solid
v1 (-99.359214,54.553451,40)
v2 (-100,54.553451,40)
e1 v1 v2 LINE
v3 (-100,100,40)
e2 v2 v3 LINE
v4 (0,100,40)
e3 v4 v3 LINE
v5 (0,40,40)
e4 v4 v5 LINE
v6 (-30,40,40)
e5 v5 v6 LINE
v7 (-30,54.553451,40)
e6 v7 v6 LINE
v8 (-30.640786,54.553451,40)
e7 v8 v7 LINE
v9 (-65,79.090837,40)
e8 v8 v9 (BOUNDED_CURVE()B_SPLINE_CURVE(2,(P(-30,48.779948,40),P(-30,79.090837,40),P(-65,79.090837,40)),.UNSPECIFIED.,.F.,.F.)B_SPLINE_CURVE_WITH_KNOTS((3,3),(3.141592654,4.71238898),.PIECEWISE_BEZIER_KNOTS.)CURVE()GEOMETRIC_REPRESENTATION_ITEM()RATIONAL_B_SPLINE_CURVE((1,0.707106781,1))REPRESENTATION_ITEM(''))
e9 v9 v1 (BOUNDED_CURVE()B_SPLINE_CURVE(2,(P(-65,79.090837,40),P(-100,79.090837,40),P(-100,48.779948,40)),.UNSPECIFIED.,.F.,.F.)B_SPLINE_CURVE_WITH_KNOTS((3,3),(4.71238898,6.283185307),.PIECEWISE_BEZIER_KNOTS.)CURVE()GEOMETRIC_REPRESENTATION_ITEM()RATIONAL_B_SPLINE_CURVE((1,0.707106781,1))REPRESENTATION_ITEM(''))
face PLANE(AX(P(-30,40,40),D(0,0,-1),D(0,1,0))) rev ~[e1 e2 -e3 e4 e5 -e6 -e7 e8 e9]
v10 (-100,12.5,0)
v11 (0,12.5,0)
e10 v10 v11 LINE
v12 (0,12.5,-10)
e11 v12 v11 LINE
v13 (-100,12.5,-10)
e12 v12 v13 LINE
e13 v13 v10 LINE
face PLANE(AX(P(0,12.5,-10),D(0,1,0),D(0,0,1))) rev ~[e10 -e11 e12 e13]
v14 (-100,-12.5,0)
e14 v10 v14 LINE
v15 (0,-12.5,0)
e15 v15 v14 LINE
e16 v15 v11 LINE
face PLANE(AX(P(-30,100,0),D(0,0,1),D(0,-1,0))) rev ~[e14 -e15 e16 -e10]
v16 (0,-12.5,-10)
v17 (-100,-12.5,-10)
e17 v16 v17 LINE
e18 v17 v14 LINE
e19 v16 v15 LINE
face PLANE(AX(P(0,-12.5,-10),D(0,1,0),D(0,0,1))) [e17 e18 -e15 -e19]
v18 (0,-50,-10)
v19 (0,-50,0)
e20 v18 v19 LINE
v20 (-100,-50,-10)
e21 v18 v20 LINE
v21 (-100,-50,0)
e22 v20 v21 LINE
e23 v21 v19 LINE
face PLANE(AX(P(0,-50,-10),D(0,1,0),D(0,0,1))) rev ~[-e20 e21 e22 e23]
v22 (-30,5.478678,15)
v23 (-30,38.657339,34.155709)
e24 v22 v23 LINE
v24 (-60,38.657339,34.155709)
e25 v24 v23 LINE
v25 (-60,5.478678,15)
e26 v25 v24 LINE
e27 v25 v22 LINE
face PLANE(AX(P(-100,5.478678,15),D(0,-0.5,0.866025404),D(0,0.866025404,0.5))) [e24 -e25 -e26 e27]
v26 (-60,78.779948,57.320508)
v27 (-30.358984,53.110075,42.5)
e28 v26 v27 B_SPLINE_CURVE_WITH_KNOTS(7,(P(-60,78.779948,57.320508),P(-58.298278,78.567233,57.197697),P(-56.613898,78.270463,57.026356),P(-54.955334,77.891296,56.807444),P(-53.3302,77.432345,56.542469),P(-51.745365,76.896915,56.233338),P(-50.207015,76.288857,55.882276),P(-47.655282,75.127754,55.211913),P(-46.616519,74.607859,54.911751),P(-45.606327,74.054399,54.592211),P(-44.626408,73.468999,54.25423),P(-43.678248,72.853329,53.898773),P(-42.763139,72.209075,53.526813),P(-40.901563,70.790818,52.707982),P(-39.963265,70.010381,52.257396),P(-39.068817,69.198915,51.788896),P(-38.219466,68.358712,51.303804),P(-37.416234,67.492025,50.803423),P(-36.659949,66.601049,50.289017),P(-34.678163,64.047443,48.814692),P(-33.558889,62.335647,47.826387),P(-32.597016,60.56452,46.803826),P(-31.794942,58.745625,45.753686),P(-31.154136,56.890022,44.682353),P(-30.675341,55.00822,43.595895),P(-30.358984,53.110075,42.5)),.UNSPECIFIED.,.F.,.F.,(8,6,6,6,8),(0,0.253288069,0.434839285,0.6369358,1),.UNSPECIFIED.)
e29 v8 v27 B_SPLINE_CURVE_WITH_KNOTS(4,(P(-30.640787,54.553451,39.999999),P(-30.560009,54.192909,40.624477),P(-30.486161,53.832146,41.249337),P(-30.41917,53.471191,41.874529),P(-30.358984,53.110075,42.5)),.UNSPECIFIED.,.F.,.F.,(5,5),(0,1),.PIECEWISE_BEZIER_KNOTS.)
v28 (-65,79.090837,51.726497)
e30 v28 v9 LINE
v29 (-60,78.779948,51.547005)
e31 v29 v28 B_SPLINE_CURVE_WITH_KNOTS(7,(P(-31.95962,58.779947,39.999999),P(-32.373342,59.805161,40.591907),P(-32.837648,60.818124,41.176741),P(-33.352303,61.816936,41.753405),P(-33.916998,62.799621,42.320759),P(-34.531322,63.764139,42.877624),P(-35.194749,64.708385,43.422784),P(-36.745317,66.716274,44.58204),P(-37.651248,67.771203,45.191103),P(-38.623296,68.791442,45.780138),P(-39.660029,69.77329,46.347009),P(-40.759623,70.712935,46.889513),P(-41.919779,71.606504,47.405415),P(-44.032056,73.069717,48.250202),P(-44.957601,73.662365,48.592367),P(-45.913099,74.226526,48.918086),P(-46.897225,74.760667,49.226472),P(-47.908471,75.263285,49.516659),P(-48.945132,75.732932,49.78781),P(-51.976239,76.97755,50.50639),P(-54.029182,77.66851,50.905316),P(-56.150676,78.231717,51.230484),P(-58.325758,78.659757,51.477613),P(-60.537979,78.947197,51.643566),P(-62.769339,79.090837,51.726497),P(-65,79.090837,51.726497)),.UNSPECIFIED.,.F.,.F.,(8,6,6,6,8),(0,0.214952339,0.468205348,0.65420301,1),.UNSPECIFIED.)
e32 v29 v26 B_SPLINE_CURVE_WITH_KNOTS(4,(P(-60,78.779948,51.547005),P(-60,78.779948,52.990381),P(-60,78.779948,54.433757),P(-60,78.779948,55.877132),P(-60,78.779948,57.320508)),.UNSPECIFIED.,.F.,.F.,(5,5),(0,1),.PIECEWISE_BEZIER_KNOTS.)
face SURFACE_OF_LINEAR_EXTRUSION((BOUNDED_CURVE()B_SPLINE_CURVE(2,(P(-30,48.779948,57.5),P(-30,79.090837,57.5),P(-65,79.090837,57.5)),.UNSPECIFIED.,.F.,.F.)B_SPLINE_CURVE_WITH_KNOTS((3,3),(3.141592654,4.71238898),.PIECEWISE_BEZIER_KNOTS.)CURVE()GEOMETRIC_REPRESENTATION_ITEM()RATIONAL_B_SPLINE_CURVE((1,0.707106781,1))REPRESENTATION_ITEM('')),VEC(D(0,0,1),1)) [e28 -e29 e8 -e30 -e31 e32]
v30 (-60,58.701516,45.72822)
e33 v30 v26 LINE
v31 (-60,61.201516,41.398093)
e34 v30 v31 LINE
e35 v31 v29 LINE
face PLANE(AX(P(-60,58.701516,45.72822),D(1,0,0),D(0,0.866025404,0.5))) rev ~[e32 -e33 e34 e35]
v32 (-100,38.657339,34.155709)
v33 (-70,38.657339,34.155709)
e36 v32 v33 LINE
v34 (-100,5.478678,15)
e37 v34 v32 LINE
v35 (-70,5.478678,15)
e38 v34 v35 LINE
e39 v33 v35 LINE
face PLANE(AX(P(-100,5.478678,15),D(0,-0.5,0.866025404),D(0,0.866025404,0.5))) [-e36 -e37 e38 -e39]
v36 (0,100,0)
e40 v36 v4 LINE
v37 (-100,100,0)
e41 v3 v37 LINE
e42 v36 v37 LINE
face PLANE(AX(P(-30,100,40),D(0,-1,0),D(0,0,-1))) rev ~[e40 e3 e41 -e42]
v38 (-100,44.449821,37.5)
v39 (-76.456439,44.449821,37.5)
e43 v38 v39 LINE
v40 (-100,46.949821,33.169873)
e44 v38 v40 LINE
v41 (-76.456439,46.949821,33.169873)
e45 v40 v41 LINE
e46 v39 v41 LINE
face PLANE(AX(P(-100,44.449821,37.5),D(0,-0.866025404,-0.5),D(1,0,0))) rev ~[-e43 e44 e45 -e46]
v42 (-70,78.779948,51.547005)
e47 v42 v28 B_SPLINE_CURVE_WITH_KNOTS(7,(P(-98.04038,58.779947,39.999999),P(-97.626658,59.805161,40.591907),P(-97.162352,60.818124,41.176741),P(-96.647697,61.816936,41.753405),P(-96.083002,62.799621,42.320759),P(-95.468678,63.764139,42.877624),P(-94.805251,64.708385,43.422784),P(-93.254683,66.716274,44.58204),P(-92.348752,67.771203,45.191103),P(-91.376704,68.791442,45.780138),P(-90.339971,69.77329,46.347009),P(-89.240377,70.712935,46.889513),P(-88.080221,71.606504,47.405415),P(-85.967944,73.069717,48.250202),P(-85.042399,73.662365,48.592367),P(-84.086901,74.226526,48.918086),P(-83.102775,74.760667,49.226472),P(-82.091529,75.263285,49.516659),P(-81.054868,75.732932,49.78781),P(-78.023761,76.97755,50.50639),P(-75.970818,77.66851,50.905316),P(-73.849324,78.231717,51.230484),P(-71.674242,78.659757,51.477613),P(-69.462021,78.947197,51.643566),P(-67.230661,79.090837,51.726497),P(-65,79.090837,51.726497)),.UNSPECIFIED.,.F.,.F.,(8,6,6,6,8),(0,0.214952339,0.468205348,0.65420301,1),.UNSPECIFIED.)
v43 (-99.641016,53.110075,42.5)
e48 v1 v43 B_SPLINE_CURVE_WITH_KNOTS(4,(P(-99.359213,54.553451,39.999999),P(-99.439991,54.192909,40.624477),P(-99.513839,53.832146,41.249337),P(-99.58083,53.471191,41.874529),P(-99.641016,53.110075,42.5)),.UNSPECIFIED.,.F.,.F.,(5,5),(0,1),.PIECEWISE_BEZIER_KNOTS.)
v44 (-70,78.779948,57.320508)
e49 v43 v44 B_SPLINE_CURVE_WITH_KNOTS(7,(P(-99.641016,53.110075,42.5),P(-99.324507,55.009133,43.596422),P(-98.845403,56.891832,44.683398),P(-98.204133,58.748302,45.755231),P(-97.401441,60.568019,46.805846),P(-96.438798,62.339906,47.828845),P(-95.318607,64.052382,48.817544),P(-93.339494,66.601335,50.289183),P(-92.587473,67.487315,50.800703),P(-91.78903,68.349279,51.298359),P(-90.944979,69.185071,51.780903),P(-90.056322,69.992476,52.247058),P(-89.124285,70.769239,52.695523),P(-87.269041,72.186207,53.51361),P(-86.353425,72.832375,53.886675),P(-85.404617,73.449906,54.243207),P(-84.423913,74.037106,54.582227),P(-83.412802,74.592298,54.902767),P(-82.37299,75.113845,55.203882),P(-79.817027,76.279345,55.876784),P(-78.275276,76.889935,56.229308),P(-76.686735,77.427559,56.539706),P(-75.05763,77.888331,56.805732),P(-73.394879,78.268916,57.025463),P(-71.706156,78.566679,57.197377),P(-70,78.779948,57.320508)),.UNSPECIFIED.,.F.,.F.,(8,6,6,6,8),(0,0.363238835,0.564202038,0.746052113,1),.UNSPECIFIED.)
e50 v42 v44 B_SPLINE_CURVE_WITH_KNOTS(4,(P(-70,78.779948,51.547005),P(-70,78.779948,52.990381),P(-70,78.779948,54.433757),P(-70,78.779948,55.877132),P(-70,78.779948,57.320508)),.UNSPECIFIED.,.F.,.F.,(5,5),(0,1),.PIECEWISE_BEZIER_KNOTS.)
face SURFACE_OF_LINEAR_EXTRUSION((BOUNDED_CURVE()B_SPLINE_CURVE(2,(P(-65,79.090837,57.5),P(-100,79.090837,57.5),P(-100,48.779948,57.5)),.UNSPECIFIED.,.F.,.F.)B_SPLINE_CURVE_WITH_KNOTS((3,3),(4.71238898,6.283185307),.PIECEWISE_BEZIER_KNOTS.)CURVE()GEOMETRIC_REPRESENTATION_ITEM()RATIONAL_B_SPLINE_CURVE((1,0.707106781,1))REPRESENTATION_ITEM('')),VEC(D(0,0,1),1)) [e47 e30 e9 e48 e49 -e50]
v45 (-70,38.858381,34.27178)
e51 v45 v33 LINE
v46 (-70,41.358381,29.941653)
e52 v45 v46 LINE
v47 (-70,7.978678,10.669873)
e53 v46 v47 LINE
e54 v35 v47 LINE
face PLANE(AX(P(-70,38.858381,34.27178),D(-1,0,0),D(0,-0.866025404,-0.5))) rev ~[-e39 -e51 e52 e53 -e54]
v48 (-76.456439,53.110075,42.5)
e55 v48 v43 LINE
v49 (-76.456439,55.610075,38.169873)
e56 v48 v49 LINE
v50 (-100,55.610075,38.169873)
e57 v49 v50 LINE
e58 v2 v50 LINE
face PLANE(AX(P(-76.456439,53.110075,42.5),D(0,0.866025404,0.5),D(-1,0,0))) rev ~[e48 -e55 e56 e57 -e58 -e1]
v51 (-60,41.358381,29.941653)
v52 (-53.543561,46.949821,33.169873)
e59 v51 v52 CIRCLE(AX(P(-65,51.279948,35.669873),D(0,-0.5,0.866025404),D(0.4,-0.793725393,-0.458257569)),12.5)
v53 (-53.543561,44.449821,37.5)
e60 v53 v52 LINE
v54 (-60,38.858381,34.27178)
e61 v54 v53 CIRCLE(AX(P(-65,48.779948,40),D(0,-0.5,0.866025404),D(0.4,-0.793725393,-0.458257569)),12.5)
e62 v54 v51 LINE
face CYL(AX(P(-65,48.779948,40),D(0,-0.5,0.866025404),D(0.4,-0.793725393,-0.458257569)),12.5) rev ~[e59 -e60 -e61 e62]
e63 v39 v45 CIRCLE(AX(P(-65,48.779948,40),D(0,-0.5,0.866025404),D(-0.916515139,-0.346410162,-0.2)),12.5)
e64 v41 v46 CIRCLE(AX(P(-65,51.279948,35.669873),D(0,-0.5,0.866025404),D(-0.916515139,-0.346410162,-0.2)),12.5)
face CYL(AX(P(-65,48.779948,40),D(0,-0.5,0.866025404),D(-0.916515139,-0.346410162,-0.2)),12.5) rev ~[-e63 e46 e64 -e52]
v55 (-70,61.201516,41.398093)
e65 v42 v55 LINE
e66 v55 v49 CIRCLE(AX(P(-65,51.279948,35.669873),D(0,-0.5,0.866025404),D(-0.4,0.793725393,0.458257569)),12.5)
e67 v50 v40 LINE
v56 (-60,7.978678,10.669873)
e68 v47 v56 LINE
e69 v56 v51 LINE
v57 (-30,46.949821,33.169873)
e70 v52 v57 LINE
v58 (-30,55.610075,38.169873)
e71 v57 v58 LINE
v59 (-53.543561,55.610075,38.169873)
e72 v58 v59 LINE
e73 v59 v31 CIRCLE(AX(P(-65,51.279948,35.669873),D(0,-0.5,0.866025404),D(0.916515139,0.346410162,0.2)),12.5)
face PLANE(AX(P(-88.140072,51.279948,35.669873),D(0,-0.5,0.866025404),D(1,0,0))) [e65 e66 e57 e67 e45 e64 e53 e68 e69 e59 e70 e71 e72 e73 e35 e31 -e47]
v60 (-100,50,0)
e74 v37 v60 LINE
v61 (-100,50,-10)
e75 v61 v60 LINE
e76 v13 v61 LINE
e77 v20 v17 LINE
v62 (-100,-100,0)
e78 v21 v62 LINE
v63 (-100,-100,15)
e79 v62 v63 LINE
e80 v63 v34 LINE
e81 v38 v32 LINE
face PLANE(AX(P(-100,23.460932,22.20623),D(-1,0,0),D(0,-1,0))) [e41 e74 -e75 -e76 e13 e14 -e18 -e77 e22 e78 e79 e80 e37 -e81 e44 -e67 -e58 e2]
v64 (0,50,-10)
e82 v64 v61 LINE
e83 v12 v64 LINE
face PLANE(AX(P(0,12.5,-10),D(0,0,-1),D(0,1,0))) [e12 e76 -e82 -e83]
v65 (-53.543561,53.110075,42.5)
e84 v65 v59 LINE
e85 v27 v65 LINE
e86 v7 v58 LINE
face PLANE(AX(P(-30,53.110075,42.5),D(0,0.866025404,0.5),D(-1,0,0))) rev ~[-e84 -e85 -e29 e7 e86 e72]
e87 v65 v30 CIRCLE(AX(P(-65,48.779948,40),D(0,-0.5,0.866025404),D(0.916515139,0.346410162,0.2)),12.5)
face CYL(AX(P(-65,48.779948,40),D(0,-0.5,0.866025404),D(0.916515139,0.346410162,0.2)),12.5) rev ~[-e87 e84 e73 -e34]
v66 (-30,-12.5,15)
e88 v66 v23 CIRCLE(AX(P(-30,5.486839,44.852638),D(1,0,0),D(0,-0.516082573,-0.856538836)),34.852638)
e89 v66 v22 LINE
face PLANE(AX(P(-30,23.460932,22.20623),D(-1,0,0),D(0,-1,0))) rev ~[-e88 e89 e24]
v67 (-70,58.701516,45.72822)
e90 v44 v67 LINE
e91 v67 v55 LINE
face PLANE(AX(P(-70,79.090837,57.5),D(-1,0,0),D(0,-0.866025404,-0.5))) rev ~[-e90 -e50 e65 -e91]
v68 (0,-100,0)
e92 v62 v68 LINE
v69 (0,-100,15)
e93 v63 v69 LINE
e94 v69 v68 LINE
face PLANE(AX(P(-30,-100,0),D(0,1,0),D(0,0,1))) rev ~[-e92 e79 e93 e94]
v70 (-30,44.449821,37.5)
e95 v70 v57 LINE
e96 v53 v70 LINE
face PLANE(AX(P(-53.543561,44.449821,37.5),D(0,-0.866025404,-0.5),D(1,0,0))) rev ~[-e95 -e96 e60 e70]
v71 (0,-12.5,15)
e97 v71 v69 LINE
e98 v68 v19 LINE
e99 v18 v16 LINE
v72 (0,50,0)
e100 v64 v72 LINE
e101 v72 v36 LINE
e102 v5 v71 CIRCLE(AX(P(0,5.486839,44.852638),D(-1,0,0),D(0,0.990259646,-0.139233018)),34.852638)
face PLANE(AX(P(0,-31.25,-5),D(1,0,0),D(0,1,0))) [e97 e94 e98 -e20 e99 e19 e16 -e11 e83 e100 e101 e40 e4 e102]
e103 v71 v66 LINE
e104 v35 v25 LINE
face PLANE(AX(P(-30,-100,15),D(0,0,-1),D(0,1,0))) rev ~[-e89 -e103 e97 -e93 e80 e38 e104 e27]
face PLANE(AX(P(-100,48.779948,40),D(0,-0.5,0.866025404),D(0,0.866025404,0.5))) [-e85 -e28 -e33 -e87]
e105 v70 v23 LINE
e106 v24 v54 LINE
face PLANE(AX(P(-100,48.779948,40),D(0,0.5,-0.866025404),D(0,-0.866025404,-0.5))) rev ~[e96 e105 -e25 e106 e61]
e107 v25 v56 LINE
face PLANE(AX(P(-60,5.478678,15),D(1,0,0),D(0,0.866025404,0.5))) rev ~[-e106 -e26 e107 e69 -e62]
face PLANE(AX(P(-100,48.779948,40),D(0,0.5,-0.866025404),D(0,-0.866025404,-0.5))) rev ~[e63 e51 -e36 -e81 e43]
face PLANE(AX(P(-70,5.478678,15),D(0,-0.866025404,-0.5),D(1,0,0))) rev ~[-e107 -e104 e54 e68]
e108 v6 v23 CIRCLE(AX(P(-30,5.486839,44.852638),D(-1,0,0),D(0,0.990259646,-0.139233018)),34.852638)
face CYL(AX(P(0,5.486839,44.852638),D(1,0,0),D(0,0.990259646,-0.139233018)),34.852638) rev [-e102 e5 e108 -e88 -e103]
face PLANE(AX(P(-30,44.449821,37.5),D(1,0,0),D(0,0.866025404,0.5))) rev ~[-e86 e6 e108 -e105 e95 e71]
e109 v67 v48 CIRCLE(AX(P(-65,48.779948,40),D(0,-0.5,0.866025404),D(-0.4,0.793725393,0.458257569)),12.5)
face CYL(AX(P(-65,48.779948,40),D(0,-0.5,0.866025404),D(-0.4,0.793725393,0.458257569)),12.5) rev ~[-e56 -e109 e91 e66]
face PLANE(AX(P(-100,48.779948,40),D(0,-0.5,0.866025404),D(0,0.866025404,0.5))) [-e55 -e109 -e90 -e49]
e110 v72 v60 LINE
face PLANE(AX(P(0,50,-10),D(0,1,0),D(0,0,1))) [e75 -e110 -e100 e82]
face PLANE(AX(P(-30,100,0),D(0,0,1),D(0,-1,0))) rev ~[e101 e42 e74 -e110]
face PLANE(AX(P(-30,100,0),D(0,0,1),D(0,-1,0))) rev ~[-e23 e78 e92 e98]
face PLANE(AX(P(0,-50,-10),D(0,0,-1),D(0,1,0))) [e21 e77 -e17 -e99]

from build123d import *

# Parameters (mm, degrees)
F1_DEPTH  = 30
F0_W      = 37.5
F0_H      = 10
F2_DEPTH  = 100
F4_DEPTH  = 70
F5_W      = 20.9091625453
F5_H      = 25
F6_DEPTH  = 70
F7_DEPTH  = 70
F9_DEPTH  = 5
F12_DEPTH = 17.5


with BuildPart() as f1:
    # F0 (on Right) → F1 (new body)
    with BuildSketch(Plane.YZ):
        with BuildLine():
            Line((-100, 15), (-100, 0))
            Line((-100, 0), (-50, 0))
            Line((-50, 0), (-12.5, 0))
            Line((-12.5, 0), (12.5, 0))
            Line((12.5, 0), (50, 0))
            Line((50, 0), (100, 0))
            Line((100, 0), (100, 40))
            Line((100, 40), (40, 40))
            ThreePointArc((40, 40), (20.4711584909, 13.3855671691), (-12.5, 15))
            Line((-12.5, 15), (-100, 15))
        make_face()
    extrude(amount=-F1_DEPTH)

    # F0 (on Right) → F2 (join)
    with BuildSketch(Plane.YZ):
        with Locations((-31.25, -5)):
            Rectangle(F0_W, F0_H)
        with Locations((31.25, -5)):
            Rectangle(F0_W, F0_H)
    extrude(amount=-F2_DEPTH)

    # F3 (on face) → F4 (join)
    with BuildSketch(Plane(origin=(-30, 0, 0), x_dir=(0, -1, 0), z_dir=(-1, 0, 0))):
        with BuildLine():
            Line((12.5, 15), (-23.473678133, 15))
            ThreePointArc((-23.473678133, 15), (-34.5610974405, 25.633015883), (-40, 40))
            Line((-40, 40), (-100, 40))
            Line((-100, 40), (-100, 0))
            Line((-100, 0), (-50, 0))
            Line((-50, 0), (-12.5, 0))
            Line((-12.5, 0), (12.5, 0))
            Line((12.5, 0), (50, 0))
            Line((50, 0), (100, 0))
            Line((100, 0), (100, 15))
            Line((100, 15), (12.5, 15))
        make_face()
    extrude(amount=F4_DEPTH)

    # F5 (on face) → F6 (join)
    with BuildSketch(Plane(origin=(-100, 0, 0), x_dir=(0, -1, 0), z_dir=(-1, 0, 0))):
        with BuildLine():
            Line((-23.473678133, 15), (-5.478678133, 15))
            Line((-5.478678133, 15), (-38.6573392432, 34.1557089233))
            ThreePointArc((-38.6573392432, 34.1557089233), (-32.7999061901, 23.2030943833), (-23.473678133, 15))
        make_face()
        with Locations((-89.5454187273, 27.5)):
            Rectangle(F5_W, F5_H)
        Polygon((-79.0908374547, 40), (-48.7799483222, 40), (-79.0908374547, 57.5), align=None)
    extrude(amount=-F6_DEPTH)

    # F5 (on face) → F7 (cut)
    with BuildSketch(Plane(origin=(-100, 0, 0), x_dir=(0, -1, 0), z_dir=(-1, 0, 0))):
        with BuildLine():
            Line((-48.7799483222, 40), (-38.6573392432, 34.1557089233))
            ThreePointArc((-38.6573392432, 34.1557089233), (-39.4545948044, 37.048924554), (-40, 40))
            Line((-40, 40), (-48.7799483222, 40))
        make_face()
    extrude(amount=-F7_DEPTH, mode=Mode.SUBTRACT)

    # F8 (on face) → F9 (cut)
    with BuildSketch(Plane(origin=(0, -5.1255209951, 8.8776627788), x_dir=(1, 0, 0), z_dir=(0, -0.5, 0.8660254038))):
        with BuildLine():
            Line((-85.9351158142, 57.2446744423), (-76.4564392374, 57.2446744423))
            ThreePointArc((-76.4564392374, 57.2446744423), (-77.5, 62.2446744423), (-76.4564392374, 67.2446744423))
            Line((-76.4564392374, 67.2446744423), (-85.9351158142, 67.2446744423))
            Line((-85.9351158142, 67.2446744423), (-99.6410161514, 67.2446744423))
            ThreePointArc((-99.6410161514, 67.2446744423), (-99.9101386799, 64.7511096302), (-100, 62.2446744423))
            ThreePointArc((-100, 62.2446744423), (-99.9101386799, 59.7382392545), (-99.6410161514, 57.2446744423))
            Line((-99.6410161514, 57.2446744423), (-85.9351158142, 57.2446744423))
        make_face()
        with BuildLine():
            Line((-60, 73.7011136797), (-60, 96.8856905937))
            ThreePointArc((-60, 96.8856905937), (-62.4935647997, 97.1548131213), (-64.999999975, 97.2446744423))
            ThreePointArc((-64.999999975, 97.2446744423), (-67.5064351754, 97.1548131231), (-70, 96.8856905937))
            Line((-70, 96.8856905937), (-70, 73.7011136797))
            ThreePointArc((-70, 73.7011136797), (-65, 74.7446744423), (-60, 73.7011136797))
        make_face()
        with BuildLine():
            Line((-70, 12.2446744423), (-60, 12.2446744423))
            Line((-60, 12.2446744423), (-60, 50.7882352049))
            ThreePointArc((-60, 50.7882352049), (-65, 49.7446744423), (-70, 50.7882352049))
            Line((-70, 50.7882352049), (-70, 12.2446744423))
        make_face()
        with BuildLine():
            ThreePointArc((-30.3589838486, 57.2446744423), (-30.0898613201, 59.7382392545), (-30, 62.2446744423))
            ThreePointArc((-30, 62.2446744423), (-30.0898613201, 64.7511096302), (-30.3589838486, 67.2446744423))
            Line((-30.3589838486, 67.2446744423), (-53.5435607626, 67.2446744423))
            ThreePointArc((-53.5435607626, 67.2446744423), (-52.7636710884, 64.7985449884), (-52.5, 62.2446744423))
            ThreePointArc((-52.5, 62.2446744423), (-52.7636710884, 59.6908038962), (-53.5435607626, 57.2446744423))
            Line((-53.5435607626, 57.2446744423), (-30.3589838486, 57.2446744423))
        make_face()
        with BuildLine():
            ThreePointArc((-64.999999975, 97.2446744423), (-62.4935647997, 97.1548131213), (-60, 96.8856905937))
            Line((-60, 96.8856905937), (-60, 97.2446744423))
            Line((-60, 97.2446744423), (-64.999999975, 97.2446744423))
        make_face()
        with BuildLine():
            ThreePointArc((-70, 96.8856905937), (-67.5064351754, 97.1548131231), (-64.999999975, 97.2446744423))
            Line((-64.999999975, 97.2446744423), (-70, 97.2446744423))
            Line((-70, 97.2446744423), (-70, 96.8856905937))
        make_face()
        with BuildLine():
            Line((-100, 67.2446744423), (-100, 62.2446744423))
            ThreePointArc((-100, 62.2446744423), (-99.9101386799, 64.7511096302), (-99.6410161514, 67.2446744423))
            Line((-99.6410161514, 67.2446744423), (-100, 67.2446744423))
        make_face()
        with BuildLine():
            Line((-100, 62.2446744423), (-100, 57.2446744423))
            Line((-100, 57.2446744423), (-99.6410161514, 57.2446744423))
            ThreePointArc((-99.6410161514, 57.2446744423), (-99.9101386799, 59.7382392545), (-100, 62.2446744423))
        make_face()
        with BuildLine():
            ThreePointArc((-30.3589838486, 67.2446744423), (-30.0898613201, 64.7511096302), (-30, 62.2446744423))
            Line((-30, 62.2446744423), (-30, 67.2446744423))
            Line((-30, 67.2446744423), (-30.3589838486, 67.2446744423))
        make_face()
        with BuildLine():
            Line((-30.3589838486, 57.2446744423), (-30, 57.2446744423))
            Line((-30, 57.2446744423), (-30, 62.2446744423))
            ThreePointArc((-30, 62.2446744423), (-30.0898613201, 59.7382392545), (-30.3589838486, 57.2446744423))
        make_face()
        with BuildLine():
            ThreePointArc((-70, 50.7882352049), (-65, 49.7446744423), (-60, 50.7882352049))
            ThreePointArc((-60, 50.7882352049), (-56.1611652352, 53.4058396775), (-53.5435607626, 57.2446744423))
            ThreePointArc((-53.5435607626, 57.2446744423), (-52.7636710884, 59.6908038962), (-52.5, 62.2446744423))
            ThreePointArc((-52.5, 62.2446744423), (-52.7636710884, 64.7985449884), (-53.5435607626, 67.2446744423))
            ThreePointArc((-53.5435607626, 67.2446744423), (-56.1611652352, 71.0835092071), (-60, 73.7011136797))
            ThreePointArc((-60, 73.7011136797), (-65, 74.7446744423), (-70, 73.7011136797))
            ThreePointArc((-70, 73.7011136797), (-73.8388347648, 71.0835092071), (-76.4564392374, 67.2446744423))
            ThreePointArc((-76.4564392374, 67.2446744423), (-77.5, 62.2446744423), (-76.4564392374, 57.2446744423))
            ThreePointArc((-76.4564392374, 57.2446744423), (-73.8388347648, 53.4058396775), (-70, 50.7882352049))
        make_face()
    extrude(amount=-F9_DEPTH, mode=Mode.SUBTRACT)

    # F11 (on offset) → F12 (cut)
    with BuildSketch(Plane.XY.offset(57.5)):
        with BuildLine():
            add(Edge.make_bspline(
                [(-65, 79.0908374547), (-100, 79.0908374547), (-100, 48.7799483222)],
                knots=[4.7123889804, 4.7123889804, 4.7123889804, 6.2831853072, 6.2831853072, 6.2831853072], degree=2, weights=[1, 0.7071067812, 1]))
            Line((-65, 79.0908374547), (-100, 79.0908374547))
            Line((-100, 79.0908374547), (-100, 48.7799483222))
        make_face()
        with BuildLine():
            Line((-30, 48.7799483222), (-30, 79.0908374547))
            Line((-30, 79.0908374547), (-65, 79.0908374547))
            add(Edge.make_bspline(
                [(-30, 48.7799483222), (-30, 79.0908374547), (-65, 79.0908374547)],
                knots=[3.1415926536, 3.1415926536, 3.1415926536, 4.7123889804, 4.7123889804, 4.7123889804], degree=2, weights=[1, 0.7071067812, 1]))
        make_face()
    extrude(amount=-F12_DEPTH, mode=Mode.SUBTRACT)


solid = f1.part
